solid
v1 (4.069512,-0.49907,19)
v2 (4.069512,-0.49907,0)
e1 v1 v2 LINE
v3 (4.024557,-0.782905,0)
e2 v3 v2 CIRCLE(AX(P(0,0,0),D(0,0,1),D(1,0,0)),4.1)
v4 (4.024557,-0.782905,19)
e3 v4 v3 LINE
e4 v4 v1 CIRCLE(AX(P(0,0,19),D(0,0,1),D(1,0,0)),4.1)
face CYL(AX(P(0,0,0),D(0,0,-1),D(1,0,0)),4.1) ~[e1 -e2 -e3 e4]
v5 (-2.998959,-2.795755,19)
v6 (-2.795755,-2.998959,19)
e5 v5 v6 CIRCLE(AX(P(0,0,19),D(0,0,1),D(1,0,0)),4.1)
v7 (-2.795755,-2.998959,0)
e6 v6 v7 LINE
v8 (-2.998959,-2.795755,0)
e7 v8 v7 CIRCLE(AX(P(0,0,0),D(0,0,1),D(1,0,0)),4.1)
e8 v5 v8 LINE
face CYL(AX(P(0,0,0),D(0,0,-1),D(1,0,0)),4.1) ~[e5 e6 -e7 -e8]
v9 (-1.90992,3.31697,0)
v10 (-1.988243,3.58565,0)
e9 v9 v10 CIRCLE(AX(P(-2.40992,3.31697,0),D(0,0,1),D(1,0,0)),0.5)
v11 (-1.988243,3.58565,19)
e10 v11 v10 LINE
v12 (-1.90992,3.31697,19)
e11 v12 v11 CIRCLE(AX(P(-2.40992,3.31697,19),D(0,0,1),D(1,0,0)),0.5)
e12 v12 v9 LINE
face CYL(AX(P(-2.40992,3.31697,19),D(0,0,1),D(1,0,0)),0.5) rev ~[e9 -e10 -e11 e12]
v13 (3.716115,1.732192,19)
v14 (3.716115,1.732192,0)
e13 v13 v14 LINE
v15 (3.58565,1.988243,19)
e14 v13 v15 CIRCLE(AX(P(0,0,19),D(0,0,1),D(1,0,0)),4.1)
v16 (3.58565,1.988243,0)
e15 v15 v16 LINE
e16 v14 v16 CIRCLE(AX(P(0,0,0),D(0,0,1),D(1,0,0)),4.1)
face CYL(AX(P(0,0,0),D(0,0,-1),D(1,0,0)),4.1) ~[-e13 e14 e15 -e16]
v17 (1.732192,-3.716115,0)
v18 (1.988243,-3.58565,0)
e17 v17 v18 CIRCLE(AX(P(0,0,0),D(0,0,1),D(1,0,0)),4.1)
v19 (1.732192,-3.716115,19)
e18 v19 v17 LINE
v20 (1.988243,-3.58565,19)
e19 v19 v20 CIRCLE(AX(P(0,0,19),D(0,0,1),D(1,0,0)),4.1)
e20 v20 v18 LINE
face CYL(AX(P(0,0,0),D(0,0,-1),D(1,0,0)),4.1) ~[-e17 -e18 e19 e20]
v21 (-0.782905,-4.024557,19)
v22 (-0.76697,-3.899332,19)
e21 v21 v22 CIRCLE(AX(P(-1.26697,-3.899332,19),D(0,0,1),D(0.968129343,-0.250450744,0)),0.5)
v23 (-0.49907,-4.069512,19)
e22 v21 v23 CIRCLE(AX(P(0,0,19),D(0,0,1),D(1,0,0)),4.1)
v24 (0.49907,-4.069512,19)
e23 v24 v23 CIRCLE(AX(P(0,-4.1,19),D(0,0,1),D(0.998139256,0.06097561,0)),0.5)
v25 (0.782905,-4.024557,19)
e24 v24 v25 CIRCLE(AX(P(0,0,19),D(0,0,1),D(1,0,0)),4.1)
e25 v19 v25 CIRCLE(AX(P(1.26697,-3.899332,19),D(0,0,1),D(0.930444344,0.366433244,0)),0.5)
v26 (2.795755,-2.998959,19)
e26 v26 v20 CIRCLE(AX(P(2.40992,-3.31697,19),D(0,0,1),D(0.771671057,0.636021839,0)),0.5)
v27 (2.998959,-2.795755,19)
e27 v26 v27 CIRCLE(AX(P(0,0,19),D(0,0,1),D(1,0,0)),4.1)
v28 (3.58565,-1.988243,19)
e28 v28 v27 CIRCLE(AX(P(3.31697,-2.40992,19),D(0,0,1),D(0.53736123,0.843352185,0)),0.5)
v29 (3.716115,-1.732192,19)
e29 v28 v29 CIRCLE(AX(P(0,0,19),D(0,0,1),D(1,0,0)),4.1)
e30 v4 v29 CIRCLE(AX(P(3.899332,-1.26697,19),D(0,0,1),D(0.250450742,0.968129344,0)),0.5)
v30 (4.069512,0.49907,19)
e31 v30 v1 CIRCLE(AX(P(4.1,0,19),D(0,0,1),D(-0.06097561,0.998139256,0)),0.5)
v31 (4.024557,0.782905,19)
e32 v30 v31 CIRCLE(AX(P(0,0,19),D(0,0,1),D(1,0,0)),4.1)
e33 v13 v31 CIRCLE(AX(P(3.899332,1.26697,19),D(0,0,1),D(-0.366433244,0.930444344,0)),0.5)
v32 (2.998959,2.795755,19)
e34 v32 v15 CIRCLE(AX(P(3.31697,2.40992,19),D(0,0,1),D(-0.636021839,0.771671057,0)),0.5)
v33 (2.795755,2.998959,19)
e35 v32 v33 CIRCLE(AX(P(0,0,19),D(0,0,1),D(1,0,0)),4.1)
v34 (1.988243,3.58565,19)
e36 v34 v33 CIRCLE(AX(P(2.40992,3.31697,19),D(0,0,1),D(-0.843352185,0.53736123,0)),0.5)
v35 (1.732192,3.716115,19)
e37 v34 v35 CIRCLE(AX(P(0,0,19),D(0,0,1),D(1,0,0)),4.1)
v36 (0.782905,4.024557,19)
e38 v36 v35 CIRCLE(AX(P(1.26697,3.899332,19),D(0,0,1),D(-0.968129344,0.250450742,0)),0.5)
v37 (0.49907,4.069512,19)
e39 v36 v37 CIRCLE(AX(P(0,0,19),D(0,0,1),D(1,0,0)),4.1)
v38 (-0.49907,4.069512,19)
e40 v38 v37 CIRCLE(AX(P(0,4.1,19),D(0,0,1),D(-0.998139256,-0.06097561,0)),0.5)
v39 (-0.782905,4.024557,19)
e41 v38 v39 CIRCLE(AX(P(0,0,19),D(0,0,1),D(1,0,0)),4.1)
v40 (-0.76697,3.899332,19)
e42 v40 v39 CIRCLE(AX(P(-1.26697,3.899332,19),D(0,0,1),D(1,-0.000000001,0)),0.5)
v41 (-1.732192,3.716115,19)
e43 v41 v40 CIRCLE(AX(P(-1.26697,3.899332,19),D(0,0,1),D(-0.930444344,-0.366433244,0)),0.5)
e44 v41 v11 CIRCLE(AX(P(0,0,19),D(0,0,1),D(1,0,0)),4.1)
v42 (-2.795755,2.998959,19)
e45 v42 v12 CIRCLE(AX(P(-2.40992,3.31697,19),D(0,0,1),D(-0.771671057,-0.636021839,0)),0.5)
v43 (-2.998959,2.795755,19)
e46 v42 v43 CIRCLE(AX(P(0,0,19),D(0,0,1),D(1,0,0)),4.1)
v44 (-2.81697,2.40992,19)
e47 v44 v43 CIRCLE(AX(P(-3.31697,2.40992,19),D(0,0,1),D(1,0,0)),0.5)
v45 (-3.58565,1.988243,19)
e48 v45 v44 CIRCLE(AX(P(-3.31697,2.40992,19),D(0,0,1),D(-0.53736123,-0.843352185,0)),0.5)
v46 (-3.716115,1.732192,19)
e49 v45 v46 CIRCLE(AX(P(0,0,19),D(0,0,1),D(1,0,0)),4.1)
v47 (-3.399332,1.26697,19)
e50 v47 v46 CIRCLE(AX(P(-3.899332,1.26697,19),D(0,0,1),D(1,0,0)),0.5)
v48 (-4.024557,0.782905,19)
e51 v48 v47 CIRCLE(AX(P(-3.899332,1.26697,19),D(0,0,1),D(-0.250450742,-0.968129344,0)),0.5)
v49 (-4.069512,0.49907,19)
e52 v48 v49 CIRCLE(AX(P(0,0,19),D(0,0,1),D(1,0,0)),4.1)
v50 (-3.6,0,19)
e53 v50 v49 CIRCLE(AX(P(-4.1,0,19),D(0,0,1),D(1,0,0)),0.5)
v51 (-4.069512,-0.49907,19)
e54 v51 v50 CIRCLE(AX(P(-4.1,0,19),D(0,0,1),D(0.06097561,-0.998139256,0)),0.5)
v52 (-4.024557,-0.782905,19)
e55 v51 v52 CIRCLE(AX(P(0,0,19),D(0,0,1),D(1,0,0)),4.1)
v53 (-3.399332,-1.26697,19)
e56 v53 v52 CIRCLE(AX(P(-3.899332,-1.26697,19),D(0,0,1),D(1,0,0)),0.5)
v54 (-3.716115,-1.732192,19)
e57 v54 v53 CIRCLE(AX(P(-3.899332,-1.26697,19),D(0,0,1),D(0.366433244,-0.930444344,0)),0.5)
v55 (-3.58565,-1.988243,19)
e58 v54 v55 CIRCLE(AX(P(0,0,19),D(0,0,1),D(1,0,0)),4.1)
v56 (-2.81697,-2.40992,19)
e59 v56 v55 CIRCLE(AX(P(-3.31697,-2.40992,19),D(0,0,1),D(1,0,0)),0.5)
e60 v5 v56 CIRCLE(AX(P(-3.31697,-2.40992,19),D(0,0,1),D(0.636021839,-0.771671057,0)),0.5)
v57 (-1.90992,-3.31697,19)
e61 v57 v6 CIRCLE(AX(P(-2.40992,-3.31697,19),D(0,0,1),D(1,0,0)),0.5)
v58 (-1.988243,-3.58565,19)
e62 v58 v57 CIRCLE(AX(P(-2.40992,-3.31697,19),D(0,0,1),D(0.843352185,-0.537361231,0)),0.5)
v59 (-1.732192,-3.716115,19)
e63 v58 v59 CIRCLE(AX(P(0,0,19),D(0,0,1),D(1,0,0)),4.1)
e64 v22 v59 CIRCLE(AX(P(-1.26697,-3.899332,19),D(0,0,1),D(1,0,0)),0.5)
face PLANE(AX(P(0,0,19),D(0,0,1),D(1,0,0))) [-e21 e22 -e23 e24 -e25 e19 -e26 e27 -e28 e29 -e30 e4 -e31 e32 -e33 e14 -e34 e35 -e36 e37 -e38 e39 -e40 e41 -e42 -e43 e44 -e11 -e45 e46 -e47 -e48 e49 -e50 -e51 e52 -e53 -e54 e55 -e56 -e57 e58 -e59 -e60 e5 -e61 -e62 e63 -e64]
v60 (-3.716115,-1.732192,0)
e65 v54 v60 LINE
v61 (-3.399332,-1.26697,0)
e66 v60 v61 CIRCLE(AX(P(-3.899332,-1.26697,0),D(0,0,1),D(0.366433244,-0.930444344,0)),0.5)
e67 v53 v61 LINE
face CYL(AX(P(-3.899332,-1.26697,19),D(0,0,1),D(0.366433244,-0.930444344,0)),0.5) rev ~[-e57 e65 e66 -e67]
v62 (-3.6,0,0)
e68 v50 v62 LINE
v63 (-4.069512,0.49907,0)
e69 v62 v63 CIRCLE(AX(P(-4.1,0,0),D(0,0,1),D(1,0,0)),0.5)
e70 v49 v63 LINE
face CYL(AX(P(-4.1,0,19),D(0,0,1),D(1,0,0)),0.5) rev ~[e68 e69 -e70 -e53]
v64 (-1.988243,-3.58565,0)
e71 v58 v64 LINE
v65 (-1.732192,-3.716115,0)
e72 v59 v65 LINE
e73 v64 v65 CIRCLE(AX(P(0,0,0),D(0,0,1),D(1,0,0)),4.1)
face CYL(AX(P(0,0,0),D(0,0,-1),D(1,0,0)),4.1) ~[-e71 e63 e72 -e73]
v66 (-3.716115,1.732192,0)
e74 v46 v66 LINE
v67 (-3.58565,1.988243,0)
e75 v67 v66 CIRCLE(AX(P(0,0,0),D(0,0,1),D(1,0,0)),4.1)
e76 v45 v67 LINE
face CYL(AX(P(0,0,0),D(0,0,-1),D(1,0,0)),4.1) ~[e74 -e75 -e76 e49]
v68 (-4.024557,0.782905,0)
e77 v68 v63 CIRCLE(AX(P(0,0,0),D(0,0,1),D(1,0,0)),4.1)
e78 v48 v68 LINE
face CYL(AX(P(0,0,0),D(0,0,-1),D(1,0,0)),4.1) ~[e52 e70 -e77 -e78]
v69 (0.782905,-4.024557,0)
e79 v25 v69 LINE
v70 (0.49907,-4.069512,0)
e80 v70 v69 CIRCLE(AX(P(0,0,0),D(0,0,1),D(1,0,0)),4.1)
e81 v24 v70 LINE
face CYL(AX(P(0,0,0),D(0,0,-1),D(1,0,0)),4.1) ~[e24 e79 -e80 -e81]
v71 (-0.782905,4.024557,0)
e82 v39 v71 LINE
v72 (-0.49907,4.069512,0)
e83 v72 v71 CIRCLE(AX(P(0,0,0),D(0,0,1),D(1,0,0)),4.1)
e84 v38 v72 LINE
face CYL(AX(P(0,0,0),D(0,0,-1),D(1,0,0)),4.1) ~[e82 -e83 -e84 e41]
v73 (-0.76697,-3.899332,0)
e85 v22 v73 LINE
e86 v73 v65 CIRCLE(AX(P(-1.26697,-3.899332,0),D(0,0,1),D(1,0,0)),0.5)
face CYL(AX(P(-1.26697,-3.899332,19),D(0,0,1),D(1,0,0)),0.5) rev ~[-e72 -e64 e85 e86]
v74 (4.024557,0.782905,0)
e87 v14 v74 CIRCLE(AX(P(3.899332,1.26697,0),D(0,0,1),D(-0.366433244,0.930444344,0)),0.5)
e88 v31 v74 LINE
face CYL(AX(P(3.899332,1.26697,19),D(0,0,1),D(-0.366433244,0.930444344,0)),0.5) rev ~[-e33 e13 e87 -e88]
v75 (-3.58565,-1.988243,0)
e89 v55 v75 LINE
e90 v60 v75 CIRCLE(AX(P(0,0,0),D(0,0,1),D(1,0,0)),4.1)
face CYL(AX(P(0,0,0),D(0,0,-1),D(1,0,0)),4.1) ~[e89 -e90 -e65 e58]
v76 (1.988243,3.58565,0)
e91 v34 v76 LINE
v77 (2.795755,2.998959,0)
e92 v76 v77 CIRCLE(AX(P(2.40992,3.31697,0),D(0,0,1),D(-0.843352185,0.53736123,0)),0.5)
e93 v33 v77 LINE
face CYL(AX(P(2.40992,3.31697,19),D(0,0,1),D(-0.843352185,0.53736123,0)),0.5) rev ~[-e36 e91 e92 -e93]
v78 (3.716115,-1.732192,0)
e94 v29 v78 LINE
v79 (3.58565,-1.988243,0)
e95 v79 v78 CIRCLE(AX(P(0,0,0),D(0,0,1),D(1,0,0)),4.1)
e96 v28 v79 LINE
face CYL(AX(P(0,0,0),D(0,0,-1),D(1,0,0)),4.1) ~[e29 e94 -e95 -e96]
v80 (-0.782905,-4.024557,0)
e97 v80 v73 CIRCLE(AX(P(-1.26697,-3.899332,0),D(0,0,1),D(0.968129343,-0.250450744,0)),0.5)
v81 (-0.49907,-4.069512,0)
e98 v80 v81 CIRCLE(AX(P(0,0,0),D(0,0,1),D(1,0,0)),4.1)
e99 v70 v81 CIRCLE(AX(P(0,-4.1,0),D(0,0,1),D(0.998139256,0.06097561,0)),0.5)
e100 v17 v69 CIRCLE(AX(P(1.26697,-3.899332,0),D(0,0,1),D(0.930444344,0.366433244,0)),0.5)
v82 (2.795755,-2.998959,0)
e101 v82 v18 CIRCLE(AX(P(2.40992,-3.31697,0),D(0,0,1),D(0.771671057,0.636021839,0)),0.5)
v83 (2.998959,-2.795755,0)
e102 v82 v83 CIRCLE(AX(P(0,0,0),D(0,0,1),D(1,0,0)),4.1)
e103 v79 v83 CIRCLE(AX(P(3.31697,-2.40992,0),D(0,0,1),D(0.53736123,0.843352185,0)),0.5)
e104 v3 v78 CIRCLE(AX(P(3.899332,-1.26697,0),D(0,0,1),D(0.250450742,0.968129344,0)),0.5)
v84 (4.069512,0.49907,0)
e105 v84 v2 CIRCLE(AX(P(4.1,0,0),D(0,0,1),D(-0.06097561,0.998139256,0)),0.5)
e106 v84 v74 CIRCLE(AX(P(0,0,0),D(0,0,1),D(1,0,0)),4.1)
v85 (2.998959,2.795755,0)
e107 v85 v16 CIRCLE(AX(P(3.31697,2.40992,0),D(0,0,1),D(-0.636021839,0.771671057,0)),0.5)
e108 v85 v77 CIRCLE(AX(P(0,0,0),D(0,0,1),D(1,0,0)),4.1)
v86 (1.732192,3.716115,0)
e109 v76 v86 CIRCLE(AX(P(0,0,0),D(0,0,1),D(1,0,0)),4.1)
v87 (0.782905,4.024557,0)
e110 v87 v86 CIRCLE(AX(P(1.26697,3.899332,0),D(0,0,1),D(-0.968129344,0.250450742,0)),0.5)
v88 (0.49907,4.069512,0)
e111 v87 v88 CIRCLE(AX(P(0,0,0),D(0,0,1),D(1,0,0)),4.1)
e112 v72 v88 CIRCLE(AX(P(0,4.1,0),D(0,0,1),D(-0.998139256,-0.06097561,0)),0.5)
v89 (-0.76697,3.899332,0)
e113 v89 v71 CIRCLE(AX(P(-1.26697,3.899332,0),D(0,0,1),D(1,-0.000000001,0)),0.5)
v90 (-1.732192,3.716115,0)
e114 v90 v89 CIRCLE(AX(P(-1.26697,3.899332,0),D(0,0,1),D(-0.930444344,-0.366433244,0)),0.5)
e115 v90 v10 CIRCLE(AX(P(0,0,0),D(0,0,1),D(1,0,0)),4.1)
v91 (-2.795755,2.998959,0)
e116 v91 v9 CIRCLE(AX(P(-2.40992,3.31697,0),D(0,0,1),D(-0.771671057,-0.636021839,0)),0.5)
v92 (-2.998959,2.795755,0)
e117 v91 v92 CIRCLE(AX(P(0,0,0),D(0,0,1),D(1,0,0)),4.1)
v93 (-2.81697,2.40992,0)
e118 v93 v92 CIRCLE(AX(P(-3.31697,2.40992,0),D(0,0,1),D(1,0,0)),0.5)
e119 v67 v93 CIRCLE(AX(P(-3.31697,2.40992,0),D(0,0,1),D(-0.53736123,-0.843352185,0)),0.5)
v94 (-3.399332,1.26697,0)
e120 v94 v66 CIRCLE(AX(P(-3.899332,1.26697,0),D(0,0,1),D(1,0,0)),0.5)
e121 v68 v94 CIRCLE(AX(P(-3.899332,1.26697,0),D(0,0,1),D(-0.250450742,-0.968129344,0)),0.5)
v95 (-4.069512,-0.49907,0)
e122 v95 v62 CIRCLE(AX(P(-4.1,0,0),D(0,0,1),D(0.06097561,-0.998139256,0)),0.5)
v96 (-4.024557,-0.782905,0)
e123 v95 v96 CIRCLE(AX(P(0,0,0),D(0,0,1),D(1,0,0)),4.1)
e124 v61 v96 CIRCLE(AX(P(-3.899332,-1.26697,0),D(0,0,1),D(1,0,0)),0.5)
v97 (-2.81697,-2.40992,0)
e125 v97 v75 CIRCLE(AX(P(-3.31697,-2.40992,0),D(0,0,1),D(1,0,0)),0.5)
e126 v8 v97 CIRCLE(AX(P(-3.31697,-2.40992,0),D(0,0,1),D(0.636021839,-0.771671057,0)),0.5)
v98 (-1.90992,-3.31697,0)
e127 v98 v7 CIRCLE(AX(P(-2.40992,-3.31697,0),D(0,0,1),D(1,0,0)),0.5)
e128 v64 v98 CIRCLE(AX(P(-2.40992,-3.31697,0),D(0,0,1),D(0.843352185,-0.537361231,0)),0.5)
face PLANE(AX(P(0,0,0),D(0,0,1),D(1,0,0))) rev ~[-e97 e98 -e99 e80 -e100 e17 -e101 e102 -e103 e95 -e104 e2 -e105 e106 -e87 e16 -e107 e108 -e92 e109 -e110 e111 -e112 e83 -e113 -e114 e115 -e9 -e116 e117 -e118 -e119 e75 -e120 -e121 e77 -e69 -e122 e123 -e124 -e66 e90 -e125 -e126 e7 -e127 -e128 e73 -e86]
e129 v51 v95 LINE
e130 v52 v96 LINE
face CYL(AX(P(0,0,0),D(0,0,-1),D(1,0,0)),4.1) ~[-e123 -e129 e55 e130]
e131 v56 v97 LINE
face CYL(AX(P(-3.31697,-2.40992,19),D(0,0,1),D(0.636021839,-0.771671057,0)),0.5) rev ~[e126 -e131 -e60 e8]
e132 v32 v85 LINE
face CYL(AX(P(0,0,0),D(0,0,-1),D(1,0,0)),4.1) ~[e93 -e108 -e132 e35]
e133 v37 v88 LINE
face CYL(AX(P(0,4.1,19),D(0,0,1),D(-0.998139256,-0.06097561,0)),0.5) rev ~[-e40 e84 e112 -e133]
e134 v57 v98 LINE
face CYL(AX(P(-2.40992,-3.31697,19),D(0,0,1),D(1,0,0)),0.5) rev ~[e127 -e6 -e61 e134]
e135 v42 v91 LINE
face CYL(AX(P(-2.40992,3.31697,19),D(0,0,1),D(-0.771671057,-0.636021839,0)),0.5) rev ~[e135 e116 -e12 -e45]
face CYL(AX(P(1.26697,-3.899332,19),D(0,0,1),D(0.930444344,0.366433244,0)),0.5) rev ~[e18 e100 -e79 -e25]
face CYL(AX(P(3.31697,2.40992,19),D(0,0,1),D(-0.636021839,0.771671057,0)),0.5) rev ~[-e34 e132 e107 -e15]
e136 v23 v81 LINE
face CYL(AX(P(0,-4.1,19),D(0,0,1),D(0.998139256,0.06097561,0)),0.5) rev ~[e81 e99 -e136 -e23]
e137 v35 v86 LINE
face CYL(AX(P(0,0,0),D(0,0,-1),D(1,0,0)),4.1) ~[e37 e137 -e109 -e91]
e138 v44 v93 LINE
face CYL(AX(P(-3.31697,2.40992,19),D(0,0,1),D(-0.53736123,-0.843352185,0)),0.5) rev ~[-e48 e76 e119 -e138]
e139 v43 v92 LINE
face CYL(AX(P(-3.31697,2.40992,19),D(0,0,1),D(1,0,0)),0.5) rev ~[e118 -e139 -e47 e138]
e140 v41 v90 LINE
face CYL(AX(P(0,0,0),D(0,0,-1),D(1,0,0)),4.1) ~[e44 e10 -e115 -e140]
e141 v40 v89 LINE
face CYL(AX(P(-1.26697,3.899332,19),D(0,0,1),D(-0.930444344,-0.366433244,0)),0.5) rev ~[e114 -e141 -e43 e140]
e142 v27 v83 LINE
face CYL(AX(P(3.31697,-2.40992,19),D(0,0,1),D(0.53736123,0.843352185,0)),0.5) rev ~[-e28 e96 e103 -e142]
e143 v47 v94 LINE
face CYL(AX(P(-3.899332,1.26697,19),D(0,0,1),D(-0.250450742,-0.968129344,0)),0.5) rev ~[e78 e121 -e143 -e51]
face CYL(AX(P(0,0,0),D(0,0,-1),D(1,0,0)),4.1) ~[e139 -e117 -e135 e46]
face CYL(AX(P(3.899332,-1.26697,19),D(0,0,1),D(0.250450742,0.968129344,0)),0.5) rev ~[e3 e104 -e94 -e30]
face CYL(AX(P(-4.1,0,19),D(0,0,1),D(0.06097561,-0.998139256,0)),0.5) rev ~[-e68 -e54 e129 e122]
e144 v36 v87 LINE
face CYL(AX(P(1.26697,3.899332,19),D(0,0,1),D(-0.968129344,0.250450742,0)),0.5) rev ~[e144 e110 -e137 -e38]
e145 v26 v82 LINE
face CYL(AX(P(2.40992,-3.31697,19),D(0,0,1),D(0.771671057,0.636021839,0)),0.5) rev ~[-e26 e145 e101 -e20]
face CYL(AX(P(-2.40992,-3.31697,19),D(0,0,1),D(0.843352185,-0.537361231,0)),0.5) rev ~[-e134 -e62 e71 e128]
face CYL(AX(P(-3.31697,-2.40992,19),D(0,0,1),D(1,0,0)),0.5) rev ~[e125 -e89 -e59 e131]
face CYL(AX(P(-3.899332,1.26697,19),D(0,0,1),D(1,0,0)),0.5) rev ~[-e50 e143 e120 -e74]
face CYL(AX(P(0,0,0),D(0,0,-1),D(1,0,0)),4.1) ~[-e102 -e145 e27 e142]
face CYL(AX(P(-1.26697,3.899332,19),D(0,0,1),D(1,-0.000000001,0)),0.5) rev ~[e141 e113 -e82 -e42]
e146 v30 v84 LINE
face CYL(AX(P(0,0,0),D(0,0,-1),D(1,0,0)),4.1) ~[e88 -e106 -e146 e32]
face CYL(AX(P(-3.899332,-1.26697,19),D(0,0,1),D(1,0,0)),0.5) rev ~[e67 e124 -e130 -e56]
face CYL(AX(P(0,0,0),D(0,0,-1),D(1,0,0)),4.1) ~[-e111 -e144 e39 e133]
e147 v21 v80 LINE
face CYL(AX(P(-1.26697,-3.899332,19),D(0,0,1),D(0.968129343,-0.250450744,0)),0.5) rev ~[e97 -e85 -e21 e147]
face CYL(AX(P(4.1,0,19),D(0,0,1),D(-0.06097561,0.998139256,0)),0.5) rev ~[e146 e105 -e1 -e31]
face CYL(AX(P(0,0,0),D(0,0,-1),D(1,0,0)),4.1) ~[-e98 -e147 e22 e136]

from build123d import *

# Parameters (mm, degrees)
F0_R     = 4.1
F0_R_2   = 3
F1_DEPTH = 19
F3_DEPTH = 25


with BuildPart() as f1:
    # F0 (on Top) → F1 (new body)
    with BuildSketch(Plane.XY):
        Circle(F0_R)
        Circle(F0_R_2, mode=Mode.SUBTRACT)
        Circle(F0_R_2)
    extrude(amount=F1_DEPTH)

    # F2 (on face) → F3 (cut)
    with BuildSketch(Plane.XY.offset(19)):
        with BuildLine():
            ThreePointArc((0.4990696282, 4.0695121951), (0.4997673529, 4.0847490014), (0.5, 4.1))
            ThreePointArc((0.5, 4.1), (-0.0152509986, 4.5997673529), (-0.4990696282, 4.0695121951))
            ThreePointArc((-0.4990696282, 4.0695121951), (0, 4.1), (0.4990696282, 4.0695121951))
        make_face()
        with BuildLine():
            ThreePointArc((0.4990696282, 4.0695121951), (0, 4.1), (-0.4990696282, 4.0695121951))
            ThreePointArc((-0.4990696282, 4.0695121951), (0, 3.6), (0.4990696282, 4.0695121951))
        make_face()
        with BuildLine():
            ThreePointArc((-1.7321918491, 3.7161150948), (-1.2669696769, 3.8993317168), (-0.7829050052, 4.0245570878))
            ThreePointArc((-0.7829050052, 4.0245570878), (-1.4214781741, 4.374859975), (-1.7321918491, 3.7161150948))
        make_face()
        with BuildLine():
            ThreePointArc((-0.7669696769, 3.8993317168), (-0.7709695076, 3.9624493218), (-0.7829050052, 4.0245570878))
            ThreePointArc((-0.7829050052, 4.0245570878), (-1.2669696769, 3.8993317168), (-1.7321918491, 3.7161150948))
            ThreePointArc((-1.7321918491, 3.7161150948), (-1.1737256049, 3.4081031111), (-0.7669696769, 3.8993317168))
        make_face()
        with BuildLine():
            ThreePointArc((1.7321918491, 3.7161150948), (1.2669696769, 3.8993317168), (0.7829050052, 4.0245570878))
            ThreePointArc((0.7829050052, 4.0245570878), (1.1124611797, 3.4238034587), (1.7321918491, 3.7161150948))
        make_face()
        with BuildLine():
            ThreePointArc((-2.7957550629, 2.9989587574), (-2.4099195344, 3.3169696769), (-1.9882434418, 3.585650292))
            ThreePointArc((-1.9882434418, 3.585650292), (-2.7038121605, 3.7214781741), (-2.7957550629, 2.9989587574))
        make_face()
        with BuildLine():
            ThreePointArc((-1.9099195344, 3.3169696769), (-1.929899719, 3.4569017206), (-1.9882434418, 3.585650292))
            ThreePointArc((-1.9882434418, 3.585650292), (-2.4099195344, 3.3169696769), (-2.7957550629, 2.9989587574))
            ThreePointArc((-2.7957550629, 2.9989587574), (-2.2409783675, 2.8463754971), (-1.9099195344, 3.3169696769))
        make_face()
        with BuildLine():
            ThreePointArc((2.7957550629, 2.9989587574), (2.4099195344, 3.3169696769), (1.9882434418, 3.585650292))
            ThreePointArc((1.9882434418, 3.585650292), (2.1160269083, 2.9124611797), (2.7957550629, 2.9989587574))
        make_face()
        with BuildLine():
            ThreePointArc((-3.585650292, 1.9882434418), (-3.3169696769, 2.4099195344), (-2.9989587574, 2.7957550629))
            ThreePointArc((-2.9989587574, 2.7957550629), (-3.7214781741, 2.7038121605), (-3.585650292, 1.9882434418))
        make_face()
        with BuildLine():
            ThreePointArc((-2.8169696769, 2.4099195344), (-2.8647498964, 2.6232204254), (-2.9989587574, 2.7957550629))
            ThreePointArc((-2.9989587574, 2.7957550629), (-3.3169696769, 2.4099195344), (-3.585650292, 1.9882434418))
            ThreePointArc((-3.585650292, 1.9882434418), (-3.0764913073, 1.9715473709), (-2.8169696769, 2.4099195344))
        make_face()
        with BuildLine():
            ThreePointArc((3.585650292, 1.9882434418), (3.3169696769, 2.4099195344), (2.9989587574, 2.7957550629))
            ThreePointArc((2.9989587574, 2.7957550629), (2.9124611797, 2.1160269083), (3.585650292, 1.9882434418))
        make_face()
        with BuildLine():
            ThreePointArc((-4.0245570878, 0.7829050052), (-3.8993317168, 1.2669696769), (-3.7161150948, 1.7321918491))
            ThreePointArc((-3.7161150948, 1.7321918491), (-4.374859975, 1.4214781741), (-4.0245570878, 0.7829050052))
        make_face()
        with BuildLine():
            ThreePointArc((-3.3993317168, 1.2669696769), (-3.486047123, 1.5483872395), (-3.7161150948, 1.7321918491))
            ThreePointArc((-3.7161150948, 1.7321918491), (-3.8993317168, 1.2669696769), (-4.0245570878, 0.7829050052))
            ThreePointArc((-4.0245570878, 0.7829050052), (-3.5932375201, 0.8716137073), (-3.3993317168, 1.2669696769))
        make_face()
        with BuildLine():
            ThreePointArc((4.0245570878, 0.7829050052), (3.8993317168, 1.2669696769), (3.7161150948, 1.7321918491))
            ThreePointArc((3.7161150948, 1.7321918491), (3.4238034587, 1.1124611797), (4.0245570878, 0.7829050052))
        make_face()
        with BuildLine():
            ThreePointArc((-4.0695121951, -0.4990696282), (-4.1, 0), (-4.0695121951, 0.4990696282))
            ThreePointArc((-4.0695121951, 0.4990696282), (-4.6, 0), (-4.0695121951, -0.4990696282))
        make_face()
        with BuildLine():
            ThreePointArc((-3.6, 0), (-3.7358270312, 0.3426047997), (-4.0695121951, 0.4990696282))
            ThreePointArc((-4.0695121951, 0.4990696282), (-4.1, 0), (-4.0695121951, -0.4990696282))
            ThreePointArc((-4.0695121951, -0.4990696282), (-3.7358270312, -0.3426047997), (-3.6, 0))
        make_face()
        with BuildLine():
            ThreePointArc((4.1, 0), (4.0923709509, 0.25), (4.0695121951, 0.4990696282))
            ThreePointArc((4.0695121951, 0.4990696282), (3.6, 0), (4.0695121951, -0.4990696282))
            ThreePointArc((4.0695121951, -0.4990696282), (4.0923709509, -0.25), (4.1, 0))
        make_face()
        with BuildLine():
            ThreePointArc((4.6, 0), (4.4426047997, 0.3641729688), (4.0695121951, 0.4990696282))
            ThreePointArc((4.0695121951, 0.4990696282), (4.0923709509, 0.25), (4.1, 0))
            ThreePointArc((4.1, 0), (4.0923709509, -0.25), (4.0695121951, -0.4990696282))
            ThreePointArc((4.0695121951, -0.4990696282), (4.4426047997, -0.3641729688), (4.6, 0))
        make_face()
        with BuildLine():
            ThreePointArc((-3.7161150948, -1.7321918491), (-3.8993317168, -1.2669696769), (-4.0245570878, -0.7829050052))
            ThreePointArc((-4.0245570878, -0.7829050052), (-4.374859975, -1.4214781741), (-3.7161150948, -1.7321918491))
        make_face()
        with BuildLine():
            ThreePointArc((-3.3993317168, -1.2669696769), (-3.5932375201, -0.8716137073), (-4.0245570878, -0.7829050052))
            ThreePointArc((-4.0245570878, -0.7829050052), (-3.8993317168, -1.2669696769), (-3.7161150948, -1.7321918491))
            ThreePointArc((-3.7161150948, -1.7321918491), (-3.486047123, -1.5483872395), (-3.3993317168, -1.2669696769))
        make_face()
        with BuildLine():
            ThreePointArc((3.7161150948, -1.7321918491), (3.8993317168, -1.2669696769), (4.0245570878, -0.7829050052))
            ThreePointArc((4.0245570878, -0.7829050052), (3.4238034587, -1.1124611797), (3.7161150948, -1.7321918491))
        make_face()
        with BuildLine():
            ThreePointArc((-2.8169696769, -2.4099195344), (-3.0764913073, -1.9715473709), (-3.585650292, -1.9882434418))
            ThreePointArc((-3.585650292, -1.9882434418), (-3.3169696769, -2.4099195344), (-2.9989587574, -2.7957550629))
            ThreePointArc((-2.9989587574, -2.7957550629), (-2.8647498964, -2.6232204254), (-2.8169696769, -2.4099195344))
        make_face()
        with BuildLine():
            ThreePointArc((2.9989587574, -2.7957550629), (3.3169696769, -2.4099195344), (3.585650292, -1.9882434418))
            ThreePointArc((3.585650292, -1.9882434418), (2.9124611797, -2.1160269083), (2.9989587574, -2.7957550629))
        make_face()
        with BuildLine():
            ThreePointArc((-1.9099195344, -3.3169696769), (-2.2409783675, -2.8463754971), (-2.7957550629, -2.9989587574))
            ThreePointArc((-2.7957550629, -2.9989587574), (-2.4099195344, -3.3169696769), (-1.9882434418, -3.585650292))
            ThreePointArc((-1.9882434418, -3.585650292), (-1.929899719, -3.4569017206), (-1.9099195344, -3.3169696769))
        make_face()
        with BuildLine():
            ThreePointArc((1.9882434418, -3.585650292), (2.4099195344, -3.3169696769), (2.7957550629, -2.9989587574))
            ThreePointArc((2.7957550629, -2.9989587574), (2.1160269083, -2.9124611797), (1.9882434418, -3.585650292))
        make_face()
        with BuildLine():
            ThreePointArc((-0.7669696769, -3.8993317168), (-1.1737256049, -3.4081031111), (-1.7321918491, -3.7161150948))
            ThreePointArc((-1.7321918491, -3.7161150948), (-1.2669696769, -3.8993317168), (-0.7829050052, -4.0245570878))
            ThreePointArc((-0.7829050052, -4.0245570878), (-0.7709695076, -3.9624493218), (-0.7669696769, -3.8993317168))
        make_face()
        with BuildLine():
            ThreePointArc((0.7829050052, -4.0245570878), (1.2669696769, -3.8993317168), (1.7321918491, -3.7161150948))
            ThreePointArc((1.7321918491, -3.7161150948), (1.1124611797, -3.4238034587), (0.7829050052, -4.0245570878))
        make_face()
        with BuildLine():
            ThreePointArc((0.4990696282, -4.0695121951), (0, -3.6), (-0.4990696282, -4.0695121951))
            ThreePointArc((-0.4990696282, -4.0695121951), (0, -4.1), (0.4990696282, -4.0695121951))
        make_face()
    extrude(amount=-F3_DEPTH, mode=Mode.SUBTRACT)


solid = f1.part
